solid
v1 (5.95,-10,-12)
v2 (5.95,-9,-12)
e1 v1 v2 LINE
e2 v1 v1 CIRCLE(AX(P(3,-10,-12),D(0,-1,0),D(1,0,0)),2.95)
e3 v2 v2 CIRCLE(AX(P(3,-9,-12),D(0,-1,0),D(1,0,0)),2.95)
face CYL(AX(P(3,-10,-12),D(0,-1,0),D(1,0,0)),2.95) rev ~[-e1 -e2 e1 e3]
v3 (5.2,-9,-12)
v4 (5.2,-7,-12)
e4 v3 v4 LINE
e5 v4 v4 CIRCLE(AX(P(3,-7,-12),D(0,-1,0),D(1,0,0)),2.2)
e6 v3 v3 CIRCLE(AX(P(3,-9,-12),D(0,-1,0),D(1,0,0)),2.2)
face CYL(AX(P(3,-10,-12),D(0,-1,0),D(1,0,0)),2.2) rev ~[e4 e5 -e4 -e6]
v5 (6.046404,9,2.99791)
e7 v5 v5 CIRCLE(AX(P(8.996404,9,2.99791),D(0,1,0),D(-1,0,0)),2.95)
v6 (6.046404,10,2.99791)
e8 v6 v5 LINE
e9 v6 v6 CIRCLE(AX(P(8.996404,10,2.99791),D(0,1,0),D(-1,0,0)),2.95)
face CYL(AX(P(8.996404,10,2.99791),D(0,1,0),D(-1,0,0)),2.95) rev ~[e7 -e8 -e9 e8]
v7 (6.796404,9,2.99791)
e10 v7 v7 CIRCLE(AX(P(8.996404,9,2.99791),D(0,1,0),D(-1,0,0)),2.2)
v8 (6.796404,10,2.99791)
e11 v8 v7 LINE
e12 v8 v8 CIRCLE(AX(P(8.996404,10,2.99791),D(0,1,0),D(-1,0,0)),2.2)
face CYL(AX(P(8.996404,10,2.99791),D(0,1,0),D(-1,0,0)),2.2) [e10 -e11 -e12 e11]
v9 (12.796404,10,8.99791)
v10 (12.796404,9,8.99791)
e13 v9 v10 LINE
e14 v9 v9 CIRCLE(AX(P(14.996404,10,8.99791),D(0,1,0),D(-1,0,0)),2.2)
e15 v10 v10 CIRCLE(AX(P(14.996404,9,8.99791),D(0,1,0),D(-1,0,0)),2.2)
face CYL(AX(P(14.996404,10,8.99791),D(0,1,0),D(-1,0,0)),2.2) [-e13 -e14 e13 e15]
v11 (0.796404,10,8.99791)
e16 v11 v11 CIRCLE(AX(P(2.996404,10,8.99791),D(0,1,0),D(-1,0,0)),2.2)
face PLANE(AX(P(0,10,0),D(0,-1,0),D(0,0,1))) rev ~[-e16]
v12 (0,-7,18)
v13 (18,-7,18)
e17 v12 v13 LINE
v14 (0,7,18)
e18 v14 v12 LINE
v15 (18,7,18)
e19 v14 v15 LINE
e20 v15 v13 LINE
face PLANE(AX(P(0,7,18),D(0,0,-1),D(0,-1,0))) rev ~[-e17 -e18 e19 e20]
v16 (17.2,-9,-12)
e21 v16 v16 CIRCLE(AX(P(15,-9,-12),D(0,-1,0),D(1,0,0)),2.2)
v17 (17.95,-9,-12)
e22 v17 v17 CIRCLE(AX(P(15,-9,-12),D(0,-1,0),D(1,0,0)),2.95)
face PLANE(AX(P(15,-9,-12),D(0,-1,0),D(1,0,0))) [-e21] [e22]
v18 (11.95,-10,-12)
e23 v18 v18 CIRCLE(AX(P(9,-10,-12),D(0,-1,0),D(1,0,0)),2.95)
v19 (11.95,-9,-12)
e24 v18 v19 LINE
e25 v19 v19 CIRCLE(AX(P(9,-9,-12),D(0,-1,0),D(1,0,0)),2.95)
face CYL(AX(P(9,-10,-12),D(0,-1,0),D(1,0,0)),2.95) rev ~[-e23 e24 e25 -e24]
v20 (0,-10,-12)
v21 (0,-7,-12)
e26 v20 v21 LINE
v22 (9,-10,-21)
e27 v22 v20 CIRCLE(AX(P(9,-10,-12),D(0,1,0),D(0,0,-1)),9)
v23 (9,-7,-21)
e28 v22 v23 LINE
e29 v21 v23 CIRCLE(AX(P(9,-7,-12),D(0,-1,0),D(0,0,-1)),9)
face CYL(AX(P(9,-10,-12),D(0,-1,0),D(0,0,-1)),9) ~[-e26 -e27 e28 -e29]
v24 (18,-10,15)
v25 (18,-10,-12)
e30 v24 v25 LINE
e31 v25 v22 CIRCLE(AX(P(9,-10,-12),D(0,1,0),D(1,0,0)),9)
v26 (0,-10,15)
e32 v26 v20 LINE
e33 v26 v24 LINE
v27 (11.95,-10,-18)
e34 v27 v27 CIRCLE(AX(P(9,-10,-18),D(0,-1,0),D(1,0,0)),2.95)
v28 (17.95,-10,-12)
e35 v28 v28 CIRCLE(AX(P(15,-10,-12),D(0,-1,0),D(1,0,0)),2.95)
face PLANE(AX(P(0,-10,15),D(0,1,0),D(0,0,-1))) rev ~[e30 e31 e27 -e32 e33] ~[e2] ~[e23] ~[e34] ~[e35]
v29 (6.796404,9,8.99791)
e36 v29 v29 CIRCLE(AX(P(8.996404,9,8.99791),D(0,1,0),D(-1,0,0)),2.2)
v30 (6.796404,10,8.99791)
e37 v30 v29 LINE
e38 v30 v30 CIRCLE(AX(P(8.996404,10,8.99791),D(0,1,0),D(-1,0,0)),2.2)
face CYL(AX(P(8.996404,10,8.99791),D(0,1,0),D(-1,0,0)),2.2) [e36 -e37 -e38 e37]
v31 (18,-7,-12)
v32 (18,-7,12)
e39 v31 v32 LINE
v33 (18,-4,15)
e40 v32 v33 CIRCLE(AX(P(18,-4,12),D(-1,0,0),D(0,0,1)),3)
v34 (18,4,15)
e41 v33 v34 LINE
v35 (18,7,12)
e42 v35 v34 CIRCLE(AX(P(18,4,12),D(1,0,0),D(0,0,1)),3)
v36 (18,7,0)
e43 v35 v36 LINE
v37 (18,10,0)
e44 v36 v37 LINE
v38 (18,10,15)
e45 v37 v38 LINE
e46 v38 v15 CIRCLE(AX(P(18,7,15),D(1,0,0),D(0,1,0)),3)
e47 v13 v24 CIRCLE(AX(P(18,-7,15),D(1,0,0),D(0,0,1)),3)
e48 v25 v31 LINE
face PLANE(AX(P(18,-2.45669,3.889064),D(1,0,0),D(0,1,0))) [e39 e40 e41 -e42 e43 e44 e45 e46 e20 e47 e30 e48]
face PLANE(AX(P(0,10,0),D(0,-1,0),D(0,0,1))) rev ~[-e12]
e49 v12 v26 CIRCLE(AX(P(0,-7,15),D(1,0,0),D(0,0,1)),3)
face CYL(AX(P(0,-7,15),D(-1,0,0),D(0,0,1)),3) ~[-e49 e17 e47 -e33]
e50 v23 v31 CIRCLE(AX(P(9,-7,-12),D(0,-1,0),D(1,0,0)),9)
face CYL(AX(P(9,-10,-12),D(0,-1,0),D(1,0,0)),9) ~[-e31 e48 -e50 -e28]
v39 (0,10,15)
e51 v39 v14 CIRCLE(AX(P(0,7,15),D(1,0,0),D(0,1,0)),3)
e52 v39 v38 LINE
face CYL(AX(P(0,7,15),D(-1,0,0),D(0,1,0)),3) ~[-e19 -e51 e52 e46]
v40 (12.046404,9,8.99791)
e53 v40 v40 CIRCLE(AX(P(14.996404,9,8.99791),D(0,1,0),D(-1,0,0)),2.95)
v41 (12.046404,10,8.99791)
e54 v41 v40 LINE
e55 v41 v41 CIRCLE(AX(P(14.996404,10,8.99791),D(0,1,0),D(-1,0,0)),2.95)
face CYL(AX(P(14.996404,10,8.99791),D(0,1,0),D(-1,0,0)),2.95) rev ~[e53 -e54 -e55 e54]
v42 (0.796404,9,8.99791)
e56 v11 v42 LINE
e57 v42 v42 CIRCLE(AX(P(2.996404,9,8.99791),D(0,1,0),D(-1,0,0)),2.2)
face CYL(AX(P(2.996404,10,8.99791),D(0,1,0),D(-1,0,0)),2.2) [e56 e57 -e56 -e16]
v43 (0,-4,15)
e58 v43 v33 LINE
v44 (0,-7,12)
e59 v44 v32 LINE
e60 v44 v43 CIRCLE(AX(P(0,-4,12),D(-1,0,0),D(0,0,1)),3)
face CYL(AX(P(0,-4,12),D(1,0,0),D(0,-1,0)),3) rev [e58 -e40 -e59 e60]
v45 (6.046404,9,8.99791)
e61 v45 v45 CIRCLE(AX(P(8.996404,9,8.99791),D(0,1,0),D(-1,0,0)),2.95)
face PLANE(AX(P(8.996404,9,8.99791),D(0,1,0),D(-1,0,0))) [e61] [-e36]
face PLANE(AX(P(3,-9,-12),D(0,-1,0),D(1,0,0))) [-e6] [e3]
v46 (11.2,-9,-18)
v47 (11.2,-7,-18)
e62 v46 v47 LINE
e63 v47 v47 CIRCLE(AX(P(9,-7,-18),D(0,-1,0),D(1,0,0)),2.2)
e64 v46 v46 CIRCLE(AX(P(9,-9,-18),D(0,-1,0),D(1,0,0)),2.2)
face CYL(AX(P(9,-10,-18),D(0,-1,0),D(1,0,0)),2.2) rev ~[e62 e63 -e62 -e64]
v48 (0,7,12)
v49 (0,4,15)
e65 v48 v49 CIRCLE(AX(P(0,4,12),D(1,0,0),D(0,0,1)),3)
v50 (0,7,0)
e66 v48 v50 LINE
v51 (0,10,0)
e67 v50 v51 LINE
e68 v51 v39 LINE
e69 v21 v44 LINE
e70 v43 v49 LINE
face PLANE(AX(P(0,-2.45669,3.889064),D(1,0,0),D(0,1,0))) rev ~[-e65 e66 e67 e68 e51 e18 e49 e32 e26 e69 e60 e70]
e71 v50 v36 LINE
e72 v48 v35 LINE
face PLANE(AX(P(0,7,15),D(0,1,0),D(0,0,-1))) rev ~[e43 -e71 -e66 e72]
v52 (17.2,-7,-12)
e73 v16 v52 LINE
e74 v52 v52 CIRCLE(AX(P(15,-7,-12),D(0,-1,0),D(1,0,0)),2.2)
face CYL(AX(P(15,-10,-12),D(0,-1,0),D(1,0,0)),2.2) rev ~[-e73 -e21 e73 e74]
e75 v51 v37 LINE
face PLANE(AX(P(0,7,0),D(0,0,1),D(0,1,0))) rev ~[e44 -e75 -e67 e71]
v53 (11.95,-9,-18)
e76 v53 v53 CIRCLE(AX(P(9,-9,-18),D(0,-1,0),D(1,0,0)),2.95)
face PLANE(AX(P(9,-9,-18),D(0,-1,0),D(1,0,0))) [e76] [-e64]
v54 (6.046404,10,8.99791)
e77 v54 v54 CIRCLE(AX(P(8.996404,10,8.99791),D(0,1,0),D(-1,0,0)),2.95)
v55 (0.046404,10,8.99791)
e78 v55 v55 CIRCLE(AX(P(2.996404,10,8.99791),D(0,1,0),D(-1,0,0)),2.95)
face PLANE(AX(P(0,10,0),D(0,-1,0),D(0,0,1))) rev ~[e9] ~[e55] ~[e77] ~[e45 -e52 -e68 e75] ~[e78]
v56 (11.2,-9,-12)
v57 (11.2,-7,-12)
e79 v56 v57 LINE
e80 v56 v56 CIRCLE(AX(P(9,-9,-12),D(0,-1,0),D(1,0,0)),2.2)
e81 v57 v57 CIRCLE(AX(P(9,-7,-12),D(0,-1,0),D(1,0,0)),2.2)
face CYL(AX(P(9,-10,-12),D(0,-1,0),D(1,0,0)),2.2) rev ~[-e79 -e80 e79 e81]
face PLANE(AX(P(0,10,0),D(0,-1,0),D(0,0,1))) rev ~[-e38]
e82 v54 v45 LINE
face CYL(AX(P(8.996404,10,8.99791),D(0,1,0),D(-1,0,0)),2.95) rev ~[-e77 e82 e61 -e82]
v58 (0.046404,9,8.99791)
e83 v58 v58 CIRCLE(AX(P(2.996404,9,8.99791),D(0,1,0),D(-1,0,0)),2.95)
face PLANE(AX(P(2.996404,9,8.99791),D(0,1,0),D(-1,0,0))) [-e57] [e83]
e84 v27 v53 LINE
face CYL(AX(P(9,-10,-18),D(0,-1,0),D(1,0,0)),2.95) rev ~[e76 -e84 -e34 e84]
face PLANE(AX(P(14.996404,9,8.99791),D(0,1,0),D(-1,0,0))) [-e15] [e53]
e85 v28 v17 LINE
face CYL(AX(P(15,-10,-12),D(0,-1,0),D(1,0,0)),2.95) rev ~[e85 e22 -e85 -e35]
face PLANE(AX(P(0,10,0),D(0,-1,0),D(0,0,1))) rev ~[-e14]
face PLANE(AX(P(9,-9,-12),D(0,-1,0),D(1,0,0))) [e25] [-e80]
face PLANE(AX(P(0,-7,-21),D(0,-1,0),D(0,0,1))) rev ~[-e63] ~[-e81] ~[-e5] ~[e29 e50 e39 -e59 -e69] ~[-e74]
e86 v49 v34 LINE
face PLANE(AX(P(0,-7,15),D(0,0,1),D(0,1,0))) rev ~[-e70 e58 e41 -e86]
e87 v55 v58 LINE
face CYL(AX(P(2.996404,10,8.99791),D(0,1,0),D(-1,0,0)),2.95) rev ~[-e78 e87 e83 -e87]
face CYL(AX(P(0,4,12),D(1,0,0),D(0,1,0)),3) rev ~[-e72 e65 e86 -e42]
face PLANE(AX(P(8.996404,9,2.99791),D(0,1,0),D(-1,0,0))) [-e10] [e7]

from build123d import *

# Parameters (mm, degrees)
F1_DEPTH = 18
F2_R     = 2.95
F2_R_2   = 2.2
F3_DEPTH = 1
F4_R     = 3
F5_R     = 2.2
F6_DEPTH = 20.001
F5_R_2   = 2.95
F7_DEPTH = 1


with BuildPart() as f1:
    # F0 (on Right) → F1 (new body)
    with BuildSketch(Plane.YZ):
        with BuildLine():
            Line((10, 0), (10, 15))
            ThreePointArc((10, 15), (9.1213203436, 17.1213203436), (7, 18))
            Line((7, 18), (-7, 18))
            ThreePointArc((-7, 18), (-9.1213203436, 17.1213203436), (-10, 15))
            Line((-10, 15), (-10, -21))
            Line((-10, -21), (-7, -21))
            Line((-7, -21), (-7, 15))
            Line((-7, 15), (7, 15))
            Line((7, 15), (7, 0))
            Line((7, 0), (10, 0))
        make_face()
    extrude(amount=F1_DEPTH)

    # F2 (on face) → F3 (cut)
    with BuildSketch(Plane(origin=(0, 10, 0), x_dir=(-1, 0, 0), z_dir=(0, 1, 0))):
        with Locations((-14.9964041635, 8.9979103986)):
            Circle(F2_R)
        with Locations((-14.9964041635, 8.9979103986)):
            Circle(F2_R_2, mode=Mode.SUBTRACT)
        with Locations((-8.9964041635, 8.9979103986)):
            Circle(F2_R)
        with Locations((-8.9964041635, 8.9979103986)):
            Circle(F2_R_2, mode=Mode.SUBTRACT)
        with Locations((-2.9964041635, 8.9979103986)):
            Circle(F2_R)
        with Locations((-2.9964041635, 8.9979103986)):
            Circle(F2_R_2, mode=Mode.SUBTRACT)
        with Locations((-8.9964041635, 2.9979103986)):
            Circle(F2_R)
        with Locations((-8.9964041635, 2.9979103986)):
            Circle(F2_R_2, mode=Mode.SUBTRACT)
    extrude(amount=-F3_DEPTH, mode=Mode.SUBTRACT)

    # F4
    f4_edges = [f1.edges().sort_by_distance(p)[0] for p in [
        (9, 7, 15),
        (9, -7, 15),
    ]]
    fillet(f4_edges, radius=F4_R)

    # F5 (on face) → F6 (cut, through all)
    with BuildSketch(Plane.XZ.offset(10)):
        with BuildLine():
            ThreePointArc((18, -12), (15.3639610307, -18.3639610307), (9, -21))
            Line((9, -21), (18, -21))
            Line((18, -21), (18, -12))
        make_face()
        with BuildLine():
            ThreePointArc((9, -21), (2.6360389693, -18.3639610307), (0, -12))
            Line((0, -12), (0, -21))
            Line((0, -21), (9, -21))
        make_face()
        with Locations((3, -12)):
            Circle(F5_R)
        with Locations((9, -12)):
            Circle(F5_R)
        with Locations((15, -12)):
            Circle(F5_R)
        with Locations((9, -18)):
            Circle(F5_R)
    extrude(amount=-F6_DEPTH, mode=Mode.SUBTRACT)

    # F5 (on face) → F7 (cut)
    with BuildSketch(Plane.XZ.offset(10)):
        with Locations((3, -12)):
            Circle(F5_R_2)
        with Locations((3, -12)):
            Circle(F5_R, mode=Mode.SUBTRACT)
        with Locations((9, -12)):
            Circle(F5_R_2)
        with Locations((9, -12)):
            Circle(F5_R, mode=Mode.SUBTRACT)
        with Locations((15, -12)):
            Circle(F5_R_2)
        with Locations((15, -12)):
            Circle(F5_R, mode=Mode.SUBTRACT)
        with Locations((9, -18)):
            Circle(F5_R_2)
        with Locations((9, -18)):
            Circle(F5_R, mode=Mode.SUBTRACT)
    extrude(amount=-F7_DEPTH, mode=Mode.SUBTRACT)


solid = f1.part
